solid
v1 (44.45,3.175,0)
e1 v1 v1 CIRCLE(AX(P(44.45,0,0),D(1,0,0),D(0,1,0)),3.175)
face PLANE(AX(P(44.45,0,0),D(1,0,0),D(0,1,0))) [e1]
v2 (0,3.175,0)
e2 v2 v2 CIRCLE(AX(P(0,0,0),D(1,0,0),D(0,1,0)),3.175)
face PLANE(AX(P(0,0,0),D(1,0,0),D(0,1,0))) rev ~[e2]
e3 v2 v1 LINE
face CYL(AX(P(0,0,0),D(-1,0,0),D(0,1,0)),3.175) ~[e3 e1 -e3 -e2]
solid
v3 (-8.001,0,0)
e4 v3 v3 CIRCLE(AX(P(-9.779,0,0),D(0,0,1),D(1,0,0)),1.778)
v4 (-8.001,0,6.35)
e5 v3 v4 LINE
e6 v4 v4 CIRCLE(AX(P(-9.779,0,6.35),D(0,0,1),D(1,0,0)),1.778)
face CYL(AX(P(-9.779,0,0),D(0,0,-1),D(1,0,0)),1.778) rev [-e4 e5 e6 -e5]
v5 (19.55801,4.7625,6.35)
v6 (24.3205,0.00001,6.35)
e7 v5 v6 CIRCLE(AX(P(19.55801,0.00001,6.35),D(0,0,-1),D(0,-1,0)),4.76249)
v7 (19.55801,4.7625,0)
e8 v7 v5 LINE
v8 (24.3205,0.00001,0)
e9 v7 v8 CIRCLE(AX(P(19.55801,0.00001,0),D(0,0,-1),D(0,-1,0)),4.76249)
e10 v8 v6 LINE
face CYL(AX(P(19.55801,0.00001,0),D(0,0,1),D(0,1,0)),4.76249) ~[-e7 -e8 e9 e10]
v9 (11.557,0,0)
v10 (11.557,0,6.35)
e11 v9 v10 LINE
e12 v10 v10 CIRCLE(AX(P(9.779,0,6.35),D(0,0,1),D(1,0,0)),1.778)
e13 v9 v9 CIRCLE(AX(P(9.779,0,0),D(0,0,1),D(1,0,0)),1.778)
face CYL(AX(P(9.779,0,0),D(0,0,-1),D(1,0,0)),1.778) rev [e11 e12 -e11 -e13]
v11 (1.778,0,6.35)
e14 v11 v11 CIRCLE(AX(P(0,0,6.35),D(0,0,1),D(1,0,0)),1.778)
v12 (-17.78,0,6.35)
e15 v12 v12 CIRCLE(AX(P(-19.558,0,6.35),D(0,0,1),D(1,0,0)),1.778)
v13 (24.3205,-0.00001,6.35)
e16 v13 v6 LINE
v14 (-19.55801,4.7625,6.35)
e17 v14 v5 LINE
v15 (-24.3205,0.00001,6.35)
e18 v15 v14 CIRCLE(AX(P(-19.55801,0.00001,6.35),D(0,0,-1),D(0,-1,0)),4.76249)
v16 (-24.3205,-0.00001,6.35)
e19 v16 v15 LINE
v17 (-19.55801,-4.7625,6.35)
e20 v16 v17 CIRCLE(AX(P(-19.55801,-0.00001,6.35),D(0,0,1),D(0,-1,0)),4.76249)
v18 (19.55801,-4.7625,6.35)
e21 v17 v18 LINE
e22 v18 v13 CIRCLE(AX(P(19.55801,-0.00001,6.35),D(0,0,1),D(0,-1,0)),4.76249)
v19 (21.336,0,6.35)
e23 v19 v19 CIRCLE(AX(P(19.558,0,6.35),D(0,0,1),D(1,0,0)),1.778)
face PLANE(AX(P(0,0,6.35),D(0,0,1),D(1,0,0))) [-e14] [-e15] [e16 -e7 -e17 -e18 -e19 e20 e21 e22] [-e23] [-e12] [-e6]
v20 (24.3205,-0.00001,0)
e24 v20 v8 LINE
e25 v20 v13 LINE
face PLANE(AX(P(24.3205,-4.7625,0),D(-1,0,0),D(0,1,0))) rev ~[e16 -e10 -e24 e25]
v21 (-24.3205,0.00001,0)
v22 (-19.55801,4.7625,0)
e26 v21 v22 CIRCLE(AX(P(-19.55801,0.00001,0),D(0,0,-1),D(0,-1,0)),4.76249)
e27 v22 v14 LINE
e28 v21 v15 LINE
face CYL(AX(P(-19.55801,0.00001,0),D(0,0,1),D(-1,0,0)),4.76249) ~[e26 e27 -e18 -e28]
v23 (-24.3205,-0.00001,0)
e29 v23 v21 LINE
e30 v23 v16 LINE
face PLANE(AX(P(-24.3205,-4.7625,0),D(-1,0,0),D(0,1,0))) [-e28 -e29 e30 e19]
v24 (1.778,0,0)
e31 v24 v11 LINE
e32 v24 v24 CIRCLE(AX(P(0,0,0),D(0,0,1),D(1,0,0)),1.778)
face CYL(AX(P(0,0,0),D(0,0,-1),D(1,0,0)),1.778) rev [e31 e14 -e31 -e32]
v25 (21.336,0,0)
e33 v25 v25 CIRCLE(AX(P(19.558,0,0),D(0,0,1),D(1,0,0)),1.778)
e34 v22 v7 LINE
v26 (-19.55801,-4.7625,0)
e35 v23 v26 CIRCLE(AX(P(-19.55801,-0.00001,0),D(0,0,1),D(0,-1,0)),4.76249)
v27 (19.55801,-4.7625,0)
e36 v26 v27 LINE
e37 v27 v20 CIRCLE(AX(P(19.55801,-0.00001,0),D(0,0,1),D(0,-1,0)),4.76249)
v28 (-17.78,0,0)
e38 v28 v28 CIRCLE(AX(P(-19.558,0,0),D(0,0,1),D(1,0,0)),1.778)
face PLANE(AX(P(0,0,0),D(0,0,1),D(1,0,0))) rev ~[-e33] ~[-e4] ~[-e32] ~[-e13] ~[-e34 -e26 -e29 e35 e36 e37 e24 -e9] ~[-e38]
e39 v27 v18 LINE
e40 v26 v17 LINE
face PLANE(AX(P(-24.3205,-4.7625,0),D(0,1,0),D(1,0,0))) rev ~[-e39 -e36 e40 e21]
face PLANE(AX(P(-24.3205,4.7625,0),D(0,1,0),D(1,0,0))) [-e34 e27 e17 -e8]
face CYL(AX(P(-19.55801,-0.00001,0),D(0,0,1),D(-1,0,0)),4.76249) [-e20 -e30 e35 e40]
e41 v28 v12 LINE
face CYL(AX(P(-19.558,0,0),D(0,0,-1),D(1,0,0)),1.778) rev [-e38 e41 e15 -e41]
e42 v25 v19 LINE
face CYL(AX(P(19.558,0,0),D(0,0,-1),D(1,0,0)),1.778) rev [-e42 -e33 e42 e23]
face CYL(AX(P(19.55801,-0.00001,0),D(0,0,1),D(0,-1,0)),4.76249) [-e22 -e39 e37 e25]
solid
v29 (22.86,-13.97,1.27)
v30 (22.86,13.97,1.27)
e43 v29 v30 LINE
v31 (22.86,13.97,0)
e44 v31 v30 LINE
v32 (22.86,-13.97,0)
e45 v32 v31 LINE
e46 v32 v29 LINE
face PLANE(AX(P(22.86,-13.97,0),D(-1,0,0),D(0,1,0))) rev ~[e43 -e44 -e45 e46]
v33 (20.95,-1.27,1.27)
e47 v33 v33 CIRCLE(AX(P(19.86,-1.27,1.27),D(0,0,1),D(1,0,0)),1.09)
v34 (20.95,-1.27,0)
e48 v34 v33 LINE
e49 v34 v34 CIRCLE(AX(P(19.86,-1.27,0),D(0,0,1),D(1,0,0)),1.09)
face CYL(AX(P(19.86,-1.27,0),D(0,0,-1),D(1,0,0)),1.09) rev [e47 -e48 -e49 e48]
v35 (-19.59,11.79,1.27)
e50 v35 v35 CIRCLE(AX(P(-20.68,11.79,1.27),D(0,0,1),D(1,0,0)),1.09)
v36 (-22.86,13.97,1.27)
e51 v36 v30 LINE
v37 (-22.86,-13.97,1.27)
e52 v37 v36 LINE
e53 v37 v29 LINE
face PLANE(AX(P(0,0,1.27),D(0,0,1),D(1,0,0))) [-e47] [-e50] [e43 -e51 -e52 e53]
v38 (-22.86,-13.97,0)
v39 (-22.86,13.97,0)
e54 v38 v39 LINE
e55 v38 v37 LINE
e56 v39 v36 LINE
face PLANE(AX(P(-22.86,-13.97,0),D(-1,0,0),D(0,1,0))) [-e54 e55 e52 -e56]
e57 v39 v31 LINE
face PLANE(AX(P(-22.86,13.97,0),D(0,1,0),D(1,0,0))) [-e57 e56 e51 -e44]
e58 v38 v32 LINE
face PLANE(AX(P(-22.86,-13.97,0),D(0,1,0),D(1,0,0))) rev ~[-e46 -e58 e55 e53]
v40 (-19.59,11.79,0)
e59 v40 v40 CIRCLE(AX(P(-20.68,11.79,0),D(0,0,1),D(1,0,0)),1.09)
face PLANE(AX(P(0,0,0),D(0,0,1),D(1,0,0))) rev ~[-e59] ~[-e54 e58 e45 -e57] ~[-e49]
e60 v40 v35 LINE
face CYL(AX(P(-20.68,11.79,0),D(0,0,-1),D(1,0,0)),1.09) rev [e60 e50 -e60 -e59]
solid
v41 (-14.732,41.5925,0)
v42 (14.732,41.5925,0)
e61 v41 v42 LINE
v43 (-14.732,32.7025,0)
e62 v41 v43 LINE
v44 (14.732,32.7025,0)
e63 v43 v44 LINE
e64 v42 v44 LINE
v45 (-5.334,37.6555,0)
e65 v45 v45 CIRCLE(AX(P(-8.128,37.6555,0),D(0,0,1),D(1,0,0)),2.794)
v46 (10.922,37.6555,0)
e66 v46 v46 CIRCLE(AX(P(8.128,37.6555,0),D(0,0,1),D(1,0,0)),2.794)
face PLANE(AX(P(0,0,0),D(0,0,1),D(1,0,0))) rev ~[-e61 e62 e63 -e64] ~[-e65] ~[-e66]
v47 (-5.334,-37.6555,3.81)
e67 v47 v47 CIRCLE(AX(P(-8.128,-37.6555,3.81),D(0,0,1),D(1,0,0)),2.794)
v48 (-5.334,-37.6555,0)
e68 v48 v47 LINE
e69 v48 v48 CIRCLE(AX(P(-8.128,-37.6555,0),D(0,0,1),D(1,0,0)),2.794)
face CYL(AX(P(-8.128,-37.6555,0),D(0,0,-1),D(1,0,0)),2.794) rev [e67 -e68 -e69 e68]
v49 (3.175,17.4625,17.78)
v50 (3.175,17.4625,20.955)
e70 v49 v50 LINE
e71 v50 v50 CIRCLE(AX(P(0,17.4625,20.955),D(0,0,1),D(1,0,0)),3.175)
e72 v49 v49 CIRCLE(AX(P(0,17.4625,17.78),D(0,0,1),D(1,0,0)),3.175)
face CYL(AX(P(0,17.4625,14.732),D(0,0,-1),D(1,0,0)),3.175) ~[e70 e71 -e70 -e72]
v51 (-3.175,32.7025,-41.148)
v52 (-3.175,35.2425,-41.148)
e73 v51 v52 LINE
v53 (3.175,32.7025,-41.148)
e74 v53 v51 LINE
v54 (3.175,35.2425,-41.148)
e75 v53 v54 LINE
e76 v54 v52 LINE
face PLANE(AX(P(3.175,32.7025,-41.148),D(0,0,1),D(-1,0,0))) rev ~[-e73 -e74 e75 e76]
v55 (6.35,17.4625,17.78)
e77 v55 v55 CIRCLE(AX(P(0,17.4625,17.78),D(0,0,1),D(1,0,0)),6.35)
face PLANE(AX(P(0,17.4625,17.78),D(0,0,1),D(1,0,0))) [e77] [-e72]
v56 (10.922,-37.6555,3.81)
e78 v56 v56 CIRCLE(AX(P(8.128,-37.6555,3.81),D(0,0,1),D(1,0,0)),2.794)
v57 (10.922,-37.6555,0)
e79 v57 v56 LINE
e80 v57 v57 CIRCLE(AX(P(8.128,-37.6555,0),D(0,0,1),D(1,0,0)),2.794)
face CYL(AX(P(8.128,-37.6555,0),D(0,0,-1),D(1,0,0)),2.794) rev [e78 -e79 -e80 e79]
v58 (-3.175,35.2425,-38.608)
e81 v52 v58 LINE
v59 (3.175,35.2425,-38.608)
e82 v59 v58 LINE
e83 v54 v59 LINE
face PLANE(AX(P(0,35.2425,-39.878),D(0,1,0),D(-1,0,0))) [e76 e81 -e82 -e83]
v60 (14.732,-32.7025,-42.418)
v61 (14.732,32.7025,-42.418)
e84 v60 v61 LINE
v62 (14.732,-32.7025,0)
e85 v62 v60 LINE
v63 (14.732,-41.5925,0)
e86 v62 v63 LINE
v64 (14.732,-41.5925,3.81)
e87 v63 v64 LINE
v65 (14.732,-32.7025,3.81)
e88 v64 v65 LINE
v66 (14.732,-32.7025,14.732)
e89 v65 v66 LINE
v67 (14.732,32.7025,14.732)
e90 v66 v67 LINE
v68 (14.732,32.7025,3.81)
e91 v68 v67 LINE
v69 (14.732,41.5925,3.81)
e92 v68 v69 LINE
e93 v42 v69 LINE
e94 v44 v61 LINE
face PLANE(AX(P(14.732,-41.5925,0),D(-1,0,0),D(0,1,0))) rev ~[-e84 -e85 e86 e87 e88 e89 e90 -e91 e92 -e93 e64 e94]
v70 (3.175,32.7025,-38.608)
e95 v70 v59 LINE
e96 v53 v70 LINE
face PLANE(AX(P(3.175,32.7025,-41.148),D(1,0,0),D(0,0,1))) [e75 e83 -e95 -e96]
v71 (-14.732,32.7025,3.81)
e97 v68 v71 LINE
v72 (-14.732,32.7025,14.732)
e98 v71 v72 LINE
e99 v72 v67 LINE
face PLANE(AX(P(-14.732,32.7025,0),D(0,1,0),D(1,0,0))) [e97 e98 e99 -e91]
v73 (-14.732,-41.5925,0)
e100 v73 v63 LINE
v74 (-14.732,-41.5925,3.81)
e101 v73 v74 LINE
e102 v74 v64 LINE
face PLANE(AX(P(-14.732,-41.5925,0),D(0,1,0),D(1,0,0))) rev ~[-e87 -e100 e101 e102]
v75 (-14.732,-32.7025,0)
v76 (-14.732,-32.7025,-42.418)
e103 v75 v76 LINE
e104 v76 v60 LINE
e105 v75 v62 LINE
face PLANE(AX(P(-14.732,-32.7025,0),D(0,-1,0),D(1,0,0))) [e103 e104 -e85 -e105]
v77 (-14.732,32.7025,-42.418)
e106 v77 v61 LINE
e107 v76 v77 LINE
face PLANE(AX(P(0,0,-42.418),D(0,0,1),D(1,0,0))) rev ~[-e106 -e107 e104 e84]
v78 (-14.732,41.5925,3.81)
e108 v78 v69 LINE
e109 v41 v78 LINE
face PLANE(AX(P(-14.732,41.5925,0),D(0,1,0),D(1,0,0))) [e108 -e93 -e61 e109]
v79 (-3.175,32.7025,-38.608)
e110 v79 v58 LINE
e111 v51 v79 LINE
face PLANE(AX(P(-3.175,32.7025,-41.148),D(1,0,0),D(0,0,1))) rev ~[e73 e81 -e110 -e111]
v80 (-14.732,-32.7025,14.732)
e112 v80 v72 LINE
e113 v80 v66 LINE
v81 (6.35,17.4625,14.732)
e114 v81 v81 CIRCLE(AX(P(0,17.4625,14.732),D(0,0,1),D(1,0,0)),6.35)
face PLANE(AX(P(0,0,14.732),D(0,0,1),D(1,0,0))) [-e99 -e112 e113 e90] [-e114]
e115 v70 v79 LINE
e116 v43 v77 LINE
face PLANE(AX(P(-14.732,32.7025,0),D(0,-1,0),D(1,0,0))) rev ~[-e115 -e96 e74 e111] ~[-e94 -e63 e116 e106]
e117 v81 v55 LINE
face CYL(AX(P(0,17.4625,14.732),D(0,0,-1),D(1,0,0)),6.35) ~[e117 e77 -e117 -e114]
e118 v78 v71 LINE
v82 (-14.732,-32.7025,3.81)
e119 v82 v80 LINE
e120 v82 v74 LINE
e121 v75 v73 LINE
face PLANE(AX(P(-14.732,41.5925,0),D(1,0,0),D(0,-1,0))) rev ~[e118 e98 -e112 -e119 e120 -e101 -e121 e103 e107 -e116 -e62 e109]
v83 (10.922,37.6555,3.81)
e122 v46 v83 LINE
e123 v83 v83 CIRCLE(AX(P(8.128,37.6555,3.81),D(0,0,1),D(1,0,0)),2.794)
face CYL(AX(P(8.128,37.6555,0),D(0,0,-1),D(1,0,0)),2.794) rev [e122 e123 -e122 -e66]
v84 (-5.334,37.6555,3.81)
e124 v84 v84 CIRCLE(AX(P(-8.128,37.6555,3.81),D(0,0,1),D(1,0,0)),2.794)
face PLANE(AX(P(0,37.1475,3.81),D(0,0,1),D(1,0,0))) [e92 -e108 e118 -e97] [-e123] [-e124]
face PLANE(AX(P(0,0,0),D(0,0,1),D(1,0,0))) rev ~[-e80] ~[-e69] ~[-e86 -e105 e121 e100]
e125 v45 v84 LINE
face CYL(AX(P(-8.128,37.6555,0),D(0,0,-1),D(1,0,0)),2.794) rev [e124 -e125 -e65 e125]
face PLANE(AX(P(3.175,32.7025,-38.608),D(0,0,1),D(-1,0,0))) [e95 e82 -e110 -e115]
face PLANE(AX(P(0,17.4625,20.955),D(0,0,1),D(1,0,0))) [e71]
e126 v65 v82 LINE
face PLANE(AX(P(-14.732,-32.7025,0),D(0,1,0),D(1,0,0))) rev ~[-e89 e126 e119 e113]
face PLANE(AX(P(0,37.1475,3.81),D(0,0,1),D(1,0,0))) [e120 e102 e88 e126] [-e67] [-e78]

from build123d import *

# Parameters (mm, degrees)
F0_W      = 45.72
F0_H      = 27.94
F0_R      = 1.09
F1_DEPTH  = 1.27
F2_W      = 29.464
F2_H      = 8.89
F2_R      = 2.794
F2_H_2    = 65.405
F3_DEPTH  = 3.81
F4_DEPTH  = 14.732
F5_DEPTH  = 42.418
F6_R      = 3.175
F7_DEPTH  = 6.223
F6_R_2    = 6.35
F8_DEPTH  = 3.048
F9_W      = 6.35
F9_H      = 2.54
F10_DEPTH = 2.54
F11_R     = 3.175
F12_DEPTH = 44.45
F13_W     = 48.641
F13_H     = 9.525
F13_R     = 1.778
F14_DEPTH = 6.35
F15_R     = 4.76249


# Not quite as in the source:
# - a fillet or chamfer is up to 0.001 mm smaller than in the source, because OpenCascade refuses the exact size


with BuildPart() as f1:
    # F0 (on Top) → F1 (new body)
    with BuildSketch(Plane.XY):
        Rectangle(F0_W, F0_H)
        with Locations((19.86, -1.27)):
            Circle(F0_R, mode=Mode.SUBTRACT)
        with Locations((-20.68, 11.79)):
            Circle(F0_R, mode=Mode.SUBTRACT)
    extrude(amount=F1_DEPTH)


with BuildPart() as f3:
    # F2 (on Top) → F3 (new body)
    with BuildSketch(Plane.XY):
        with Locations((0, 37.1475)):
            Rectangle(F2_W, F2_H)
        with Locations((-8.128, 37.6555)):
            Circle(F2_R, mode=Mode.SUBTRACT)
        with Locations((8.128, 37.6555)):
            Circle(F2_R, mode=Mode.SUBTRACT)
        Rectangle(F2_W, F2_H_2)
        with Locations((0, -37.1475)):
            Rectangle(F2_W, F2_H)
        with Locations((-8.128, -37.6555)):
            Circle(F2_R, mode=Mode.SUBTRACT)
        with Locations((8.128, -37.6555)):
            Circle(F2_R, mode=Mode.SUBTRACT)
    extrude(amount=F3_DEPTH)

    # F2 (on Top) → F4 (join)
    with BuildSketch(Plane.XY):
        Rectangle(F2_W, F2_H_2)
    extrude(amount=F4_DEPTH)

    # F2 (on Top) → F5 (join)
    with BuildSketch(Plane.XY):
        Rectangle(F2_W, F2_H_2)
    extrude(amount=-F5_DEPTH)

    # F6 (on face) → F7 (join)
    with BuildSketch(Plane.XY.offset(14.732)):
        with Locations((0, 17.4625)):
            Circle(F6_R)
    extrude(amount=F7_DEPTH)

    # F6 (on face) → F8 (join)
    with BuildSketch(Plane.XY.offset(14.732)):
        with Locations((0, 17.4625)):
            Circle(F6_R_2)
        with Locations((0, 17.4625)):
            Circle(F6_R, mode=Mode.SUBTRACT)
    extrude(amount=F8_DEPTH)

    # F9 (on face) → F10 (join)
    with BuildSketch(Plane(origin=(0, 32.7025, 0), x_dir=(-1, 0, 0), z_dir=(0, 1, 0))):
        with Locations((0, -39.878)):
            Rectangle(F9_W, F9_H)
    extrude(amount=F10_DEPTH)


with BuildPart() as f12:
    # F11 (on Right) → F12 (new body)
    with BuildSketch(Plane.YZ):
        Circle(F11_R)
    extrude(amount=F12_DEPTH)


with BuildPart() as f14:
    # F13 (on Top) → F14 (new body)
    with BuildSketch(Plane.XY):
        Rectangle(F13_W, F13_H)
        with Locations((-19.558, 0)):
            Circle(F13_R, mode=Mode.SUBTRACT)
        with Locations((-9.779, 0)):
            Circle(F13_R, mode=Mode.SUBTRACT)
        Circle(F13_R, mode=Mode.SUBTRACT)
        with Locations((9.779, 0)):
            Circle(F13_R, mode=Mode.SUBTRACT)
        with Locations((19.558, 0)):
            Circle(F13_R, mode=Mode.SUBTRACT)
    extrude(amount=F14_DEPTH)

    # F15 (radius 4.7625 in the source; OpenCascade refuses exactly that, so slightly less here)
    f15_edges = [f14.edges().sort_by_distance(p)[0] for p in [
        (-24.3205, -4.7625, 3.175),
        (24.3205, -4.7625, 3.175),
        (24.3205, 4.7625, 3.175),
        (-24.3205, 4.7625, 3.175),
    ]]
    fillet(f15_edges, radius=F15_R)


solid = Compound([f1.part, f3.part, f12.part, f14.part])
